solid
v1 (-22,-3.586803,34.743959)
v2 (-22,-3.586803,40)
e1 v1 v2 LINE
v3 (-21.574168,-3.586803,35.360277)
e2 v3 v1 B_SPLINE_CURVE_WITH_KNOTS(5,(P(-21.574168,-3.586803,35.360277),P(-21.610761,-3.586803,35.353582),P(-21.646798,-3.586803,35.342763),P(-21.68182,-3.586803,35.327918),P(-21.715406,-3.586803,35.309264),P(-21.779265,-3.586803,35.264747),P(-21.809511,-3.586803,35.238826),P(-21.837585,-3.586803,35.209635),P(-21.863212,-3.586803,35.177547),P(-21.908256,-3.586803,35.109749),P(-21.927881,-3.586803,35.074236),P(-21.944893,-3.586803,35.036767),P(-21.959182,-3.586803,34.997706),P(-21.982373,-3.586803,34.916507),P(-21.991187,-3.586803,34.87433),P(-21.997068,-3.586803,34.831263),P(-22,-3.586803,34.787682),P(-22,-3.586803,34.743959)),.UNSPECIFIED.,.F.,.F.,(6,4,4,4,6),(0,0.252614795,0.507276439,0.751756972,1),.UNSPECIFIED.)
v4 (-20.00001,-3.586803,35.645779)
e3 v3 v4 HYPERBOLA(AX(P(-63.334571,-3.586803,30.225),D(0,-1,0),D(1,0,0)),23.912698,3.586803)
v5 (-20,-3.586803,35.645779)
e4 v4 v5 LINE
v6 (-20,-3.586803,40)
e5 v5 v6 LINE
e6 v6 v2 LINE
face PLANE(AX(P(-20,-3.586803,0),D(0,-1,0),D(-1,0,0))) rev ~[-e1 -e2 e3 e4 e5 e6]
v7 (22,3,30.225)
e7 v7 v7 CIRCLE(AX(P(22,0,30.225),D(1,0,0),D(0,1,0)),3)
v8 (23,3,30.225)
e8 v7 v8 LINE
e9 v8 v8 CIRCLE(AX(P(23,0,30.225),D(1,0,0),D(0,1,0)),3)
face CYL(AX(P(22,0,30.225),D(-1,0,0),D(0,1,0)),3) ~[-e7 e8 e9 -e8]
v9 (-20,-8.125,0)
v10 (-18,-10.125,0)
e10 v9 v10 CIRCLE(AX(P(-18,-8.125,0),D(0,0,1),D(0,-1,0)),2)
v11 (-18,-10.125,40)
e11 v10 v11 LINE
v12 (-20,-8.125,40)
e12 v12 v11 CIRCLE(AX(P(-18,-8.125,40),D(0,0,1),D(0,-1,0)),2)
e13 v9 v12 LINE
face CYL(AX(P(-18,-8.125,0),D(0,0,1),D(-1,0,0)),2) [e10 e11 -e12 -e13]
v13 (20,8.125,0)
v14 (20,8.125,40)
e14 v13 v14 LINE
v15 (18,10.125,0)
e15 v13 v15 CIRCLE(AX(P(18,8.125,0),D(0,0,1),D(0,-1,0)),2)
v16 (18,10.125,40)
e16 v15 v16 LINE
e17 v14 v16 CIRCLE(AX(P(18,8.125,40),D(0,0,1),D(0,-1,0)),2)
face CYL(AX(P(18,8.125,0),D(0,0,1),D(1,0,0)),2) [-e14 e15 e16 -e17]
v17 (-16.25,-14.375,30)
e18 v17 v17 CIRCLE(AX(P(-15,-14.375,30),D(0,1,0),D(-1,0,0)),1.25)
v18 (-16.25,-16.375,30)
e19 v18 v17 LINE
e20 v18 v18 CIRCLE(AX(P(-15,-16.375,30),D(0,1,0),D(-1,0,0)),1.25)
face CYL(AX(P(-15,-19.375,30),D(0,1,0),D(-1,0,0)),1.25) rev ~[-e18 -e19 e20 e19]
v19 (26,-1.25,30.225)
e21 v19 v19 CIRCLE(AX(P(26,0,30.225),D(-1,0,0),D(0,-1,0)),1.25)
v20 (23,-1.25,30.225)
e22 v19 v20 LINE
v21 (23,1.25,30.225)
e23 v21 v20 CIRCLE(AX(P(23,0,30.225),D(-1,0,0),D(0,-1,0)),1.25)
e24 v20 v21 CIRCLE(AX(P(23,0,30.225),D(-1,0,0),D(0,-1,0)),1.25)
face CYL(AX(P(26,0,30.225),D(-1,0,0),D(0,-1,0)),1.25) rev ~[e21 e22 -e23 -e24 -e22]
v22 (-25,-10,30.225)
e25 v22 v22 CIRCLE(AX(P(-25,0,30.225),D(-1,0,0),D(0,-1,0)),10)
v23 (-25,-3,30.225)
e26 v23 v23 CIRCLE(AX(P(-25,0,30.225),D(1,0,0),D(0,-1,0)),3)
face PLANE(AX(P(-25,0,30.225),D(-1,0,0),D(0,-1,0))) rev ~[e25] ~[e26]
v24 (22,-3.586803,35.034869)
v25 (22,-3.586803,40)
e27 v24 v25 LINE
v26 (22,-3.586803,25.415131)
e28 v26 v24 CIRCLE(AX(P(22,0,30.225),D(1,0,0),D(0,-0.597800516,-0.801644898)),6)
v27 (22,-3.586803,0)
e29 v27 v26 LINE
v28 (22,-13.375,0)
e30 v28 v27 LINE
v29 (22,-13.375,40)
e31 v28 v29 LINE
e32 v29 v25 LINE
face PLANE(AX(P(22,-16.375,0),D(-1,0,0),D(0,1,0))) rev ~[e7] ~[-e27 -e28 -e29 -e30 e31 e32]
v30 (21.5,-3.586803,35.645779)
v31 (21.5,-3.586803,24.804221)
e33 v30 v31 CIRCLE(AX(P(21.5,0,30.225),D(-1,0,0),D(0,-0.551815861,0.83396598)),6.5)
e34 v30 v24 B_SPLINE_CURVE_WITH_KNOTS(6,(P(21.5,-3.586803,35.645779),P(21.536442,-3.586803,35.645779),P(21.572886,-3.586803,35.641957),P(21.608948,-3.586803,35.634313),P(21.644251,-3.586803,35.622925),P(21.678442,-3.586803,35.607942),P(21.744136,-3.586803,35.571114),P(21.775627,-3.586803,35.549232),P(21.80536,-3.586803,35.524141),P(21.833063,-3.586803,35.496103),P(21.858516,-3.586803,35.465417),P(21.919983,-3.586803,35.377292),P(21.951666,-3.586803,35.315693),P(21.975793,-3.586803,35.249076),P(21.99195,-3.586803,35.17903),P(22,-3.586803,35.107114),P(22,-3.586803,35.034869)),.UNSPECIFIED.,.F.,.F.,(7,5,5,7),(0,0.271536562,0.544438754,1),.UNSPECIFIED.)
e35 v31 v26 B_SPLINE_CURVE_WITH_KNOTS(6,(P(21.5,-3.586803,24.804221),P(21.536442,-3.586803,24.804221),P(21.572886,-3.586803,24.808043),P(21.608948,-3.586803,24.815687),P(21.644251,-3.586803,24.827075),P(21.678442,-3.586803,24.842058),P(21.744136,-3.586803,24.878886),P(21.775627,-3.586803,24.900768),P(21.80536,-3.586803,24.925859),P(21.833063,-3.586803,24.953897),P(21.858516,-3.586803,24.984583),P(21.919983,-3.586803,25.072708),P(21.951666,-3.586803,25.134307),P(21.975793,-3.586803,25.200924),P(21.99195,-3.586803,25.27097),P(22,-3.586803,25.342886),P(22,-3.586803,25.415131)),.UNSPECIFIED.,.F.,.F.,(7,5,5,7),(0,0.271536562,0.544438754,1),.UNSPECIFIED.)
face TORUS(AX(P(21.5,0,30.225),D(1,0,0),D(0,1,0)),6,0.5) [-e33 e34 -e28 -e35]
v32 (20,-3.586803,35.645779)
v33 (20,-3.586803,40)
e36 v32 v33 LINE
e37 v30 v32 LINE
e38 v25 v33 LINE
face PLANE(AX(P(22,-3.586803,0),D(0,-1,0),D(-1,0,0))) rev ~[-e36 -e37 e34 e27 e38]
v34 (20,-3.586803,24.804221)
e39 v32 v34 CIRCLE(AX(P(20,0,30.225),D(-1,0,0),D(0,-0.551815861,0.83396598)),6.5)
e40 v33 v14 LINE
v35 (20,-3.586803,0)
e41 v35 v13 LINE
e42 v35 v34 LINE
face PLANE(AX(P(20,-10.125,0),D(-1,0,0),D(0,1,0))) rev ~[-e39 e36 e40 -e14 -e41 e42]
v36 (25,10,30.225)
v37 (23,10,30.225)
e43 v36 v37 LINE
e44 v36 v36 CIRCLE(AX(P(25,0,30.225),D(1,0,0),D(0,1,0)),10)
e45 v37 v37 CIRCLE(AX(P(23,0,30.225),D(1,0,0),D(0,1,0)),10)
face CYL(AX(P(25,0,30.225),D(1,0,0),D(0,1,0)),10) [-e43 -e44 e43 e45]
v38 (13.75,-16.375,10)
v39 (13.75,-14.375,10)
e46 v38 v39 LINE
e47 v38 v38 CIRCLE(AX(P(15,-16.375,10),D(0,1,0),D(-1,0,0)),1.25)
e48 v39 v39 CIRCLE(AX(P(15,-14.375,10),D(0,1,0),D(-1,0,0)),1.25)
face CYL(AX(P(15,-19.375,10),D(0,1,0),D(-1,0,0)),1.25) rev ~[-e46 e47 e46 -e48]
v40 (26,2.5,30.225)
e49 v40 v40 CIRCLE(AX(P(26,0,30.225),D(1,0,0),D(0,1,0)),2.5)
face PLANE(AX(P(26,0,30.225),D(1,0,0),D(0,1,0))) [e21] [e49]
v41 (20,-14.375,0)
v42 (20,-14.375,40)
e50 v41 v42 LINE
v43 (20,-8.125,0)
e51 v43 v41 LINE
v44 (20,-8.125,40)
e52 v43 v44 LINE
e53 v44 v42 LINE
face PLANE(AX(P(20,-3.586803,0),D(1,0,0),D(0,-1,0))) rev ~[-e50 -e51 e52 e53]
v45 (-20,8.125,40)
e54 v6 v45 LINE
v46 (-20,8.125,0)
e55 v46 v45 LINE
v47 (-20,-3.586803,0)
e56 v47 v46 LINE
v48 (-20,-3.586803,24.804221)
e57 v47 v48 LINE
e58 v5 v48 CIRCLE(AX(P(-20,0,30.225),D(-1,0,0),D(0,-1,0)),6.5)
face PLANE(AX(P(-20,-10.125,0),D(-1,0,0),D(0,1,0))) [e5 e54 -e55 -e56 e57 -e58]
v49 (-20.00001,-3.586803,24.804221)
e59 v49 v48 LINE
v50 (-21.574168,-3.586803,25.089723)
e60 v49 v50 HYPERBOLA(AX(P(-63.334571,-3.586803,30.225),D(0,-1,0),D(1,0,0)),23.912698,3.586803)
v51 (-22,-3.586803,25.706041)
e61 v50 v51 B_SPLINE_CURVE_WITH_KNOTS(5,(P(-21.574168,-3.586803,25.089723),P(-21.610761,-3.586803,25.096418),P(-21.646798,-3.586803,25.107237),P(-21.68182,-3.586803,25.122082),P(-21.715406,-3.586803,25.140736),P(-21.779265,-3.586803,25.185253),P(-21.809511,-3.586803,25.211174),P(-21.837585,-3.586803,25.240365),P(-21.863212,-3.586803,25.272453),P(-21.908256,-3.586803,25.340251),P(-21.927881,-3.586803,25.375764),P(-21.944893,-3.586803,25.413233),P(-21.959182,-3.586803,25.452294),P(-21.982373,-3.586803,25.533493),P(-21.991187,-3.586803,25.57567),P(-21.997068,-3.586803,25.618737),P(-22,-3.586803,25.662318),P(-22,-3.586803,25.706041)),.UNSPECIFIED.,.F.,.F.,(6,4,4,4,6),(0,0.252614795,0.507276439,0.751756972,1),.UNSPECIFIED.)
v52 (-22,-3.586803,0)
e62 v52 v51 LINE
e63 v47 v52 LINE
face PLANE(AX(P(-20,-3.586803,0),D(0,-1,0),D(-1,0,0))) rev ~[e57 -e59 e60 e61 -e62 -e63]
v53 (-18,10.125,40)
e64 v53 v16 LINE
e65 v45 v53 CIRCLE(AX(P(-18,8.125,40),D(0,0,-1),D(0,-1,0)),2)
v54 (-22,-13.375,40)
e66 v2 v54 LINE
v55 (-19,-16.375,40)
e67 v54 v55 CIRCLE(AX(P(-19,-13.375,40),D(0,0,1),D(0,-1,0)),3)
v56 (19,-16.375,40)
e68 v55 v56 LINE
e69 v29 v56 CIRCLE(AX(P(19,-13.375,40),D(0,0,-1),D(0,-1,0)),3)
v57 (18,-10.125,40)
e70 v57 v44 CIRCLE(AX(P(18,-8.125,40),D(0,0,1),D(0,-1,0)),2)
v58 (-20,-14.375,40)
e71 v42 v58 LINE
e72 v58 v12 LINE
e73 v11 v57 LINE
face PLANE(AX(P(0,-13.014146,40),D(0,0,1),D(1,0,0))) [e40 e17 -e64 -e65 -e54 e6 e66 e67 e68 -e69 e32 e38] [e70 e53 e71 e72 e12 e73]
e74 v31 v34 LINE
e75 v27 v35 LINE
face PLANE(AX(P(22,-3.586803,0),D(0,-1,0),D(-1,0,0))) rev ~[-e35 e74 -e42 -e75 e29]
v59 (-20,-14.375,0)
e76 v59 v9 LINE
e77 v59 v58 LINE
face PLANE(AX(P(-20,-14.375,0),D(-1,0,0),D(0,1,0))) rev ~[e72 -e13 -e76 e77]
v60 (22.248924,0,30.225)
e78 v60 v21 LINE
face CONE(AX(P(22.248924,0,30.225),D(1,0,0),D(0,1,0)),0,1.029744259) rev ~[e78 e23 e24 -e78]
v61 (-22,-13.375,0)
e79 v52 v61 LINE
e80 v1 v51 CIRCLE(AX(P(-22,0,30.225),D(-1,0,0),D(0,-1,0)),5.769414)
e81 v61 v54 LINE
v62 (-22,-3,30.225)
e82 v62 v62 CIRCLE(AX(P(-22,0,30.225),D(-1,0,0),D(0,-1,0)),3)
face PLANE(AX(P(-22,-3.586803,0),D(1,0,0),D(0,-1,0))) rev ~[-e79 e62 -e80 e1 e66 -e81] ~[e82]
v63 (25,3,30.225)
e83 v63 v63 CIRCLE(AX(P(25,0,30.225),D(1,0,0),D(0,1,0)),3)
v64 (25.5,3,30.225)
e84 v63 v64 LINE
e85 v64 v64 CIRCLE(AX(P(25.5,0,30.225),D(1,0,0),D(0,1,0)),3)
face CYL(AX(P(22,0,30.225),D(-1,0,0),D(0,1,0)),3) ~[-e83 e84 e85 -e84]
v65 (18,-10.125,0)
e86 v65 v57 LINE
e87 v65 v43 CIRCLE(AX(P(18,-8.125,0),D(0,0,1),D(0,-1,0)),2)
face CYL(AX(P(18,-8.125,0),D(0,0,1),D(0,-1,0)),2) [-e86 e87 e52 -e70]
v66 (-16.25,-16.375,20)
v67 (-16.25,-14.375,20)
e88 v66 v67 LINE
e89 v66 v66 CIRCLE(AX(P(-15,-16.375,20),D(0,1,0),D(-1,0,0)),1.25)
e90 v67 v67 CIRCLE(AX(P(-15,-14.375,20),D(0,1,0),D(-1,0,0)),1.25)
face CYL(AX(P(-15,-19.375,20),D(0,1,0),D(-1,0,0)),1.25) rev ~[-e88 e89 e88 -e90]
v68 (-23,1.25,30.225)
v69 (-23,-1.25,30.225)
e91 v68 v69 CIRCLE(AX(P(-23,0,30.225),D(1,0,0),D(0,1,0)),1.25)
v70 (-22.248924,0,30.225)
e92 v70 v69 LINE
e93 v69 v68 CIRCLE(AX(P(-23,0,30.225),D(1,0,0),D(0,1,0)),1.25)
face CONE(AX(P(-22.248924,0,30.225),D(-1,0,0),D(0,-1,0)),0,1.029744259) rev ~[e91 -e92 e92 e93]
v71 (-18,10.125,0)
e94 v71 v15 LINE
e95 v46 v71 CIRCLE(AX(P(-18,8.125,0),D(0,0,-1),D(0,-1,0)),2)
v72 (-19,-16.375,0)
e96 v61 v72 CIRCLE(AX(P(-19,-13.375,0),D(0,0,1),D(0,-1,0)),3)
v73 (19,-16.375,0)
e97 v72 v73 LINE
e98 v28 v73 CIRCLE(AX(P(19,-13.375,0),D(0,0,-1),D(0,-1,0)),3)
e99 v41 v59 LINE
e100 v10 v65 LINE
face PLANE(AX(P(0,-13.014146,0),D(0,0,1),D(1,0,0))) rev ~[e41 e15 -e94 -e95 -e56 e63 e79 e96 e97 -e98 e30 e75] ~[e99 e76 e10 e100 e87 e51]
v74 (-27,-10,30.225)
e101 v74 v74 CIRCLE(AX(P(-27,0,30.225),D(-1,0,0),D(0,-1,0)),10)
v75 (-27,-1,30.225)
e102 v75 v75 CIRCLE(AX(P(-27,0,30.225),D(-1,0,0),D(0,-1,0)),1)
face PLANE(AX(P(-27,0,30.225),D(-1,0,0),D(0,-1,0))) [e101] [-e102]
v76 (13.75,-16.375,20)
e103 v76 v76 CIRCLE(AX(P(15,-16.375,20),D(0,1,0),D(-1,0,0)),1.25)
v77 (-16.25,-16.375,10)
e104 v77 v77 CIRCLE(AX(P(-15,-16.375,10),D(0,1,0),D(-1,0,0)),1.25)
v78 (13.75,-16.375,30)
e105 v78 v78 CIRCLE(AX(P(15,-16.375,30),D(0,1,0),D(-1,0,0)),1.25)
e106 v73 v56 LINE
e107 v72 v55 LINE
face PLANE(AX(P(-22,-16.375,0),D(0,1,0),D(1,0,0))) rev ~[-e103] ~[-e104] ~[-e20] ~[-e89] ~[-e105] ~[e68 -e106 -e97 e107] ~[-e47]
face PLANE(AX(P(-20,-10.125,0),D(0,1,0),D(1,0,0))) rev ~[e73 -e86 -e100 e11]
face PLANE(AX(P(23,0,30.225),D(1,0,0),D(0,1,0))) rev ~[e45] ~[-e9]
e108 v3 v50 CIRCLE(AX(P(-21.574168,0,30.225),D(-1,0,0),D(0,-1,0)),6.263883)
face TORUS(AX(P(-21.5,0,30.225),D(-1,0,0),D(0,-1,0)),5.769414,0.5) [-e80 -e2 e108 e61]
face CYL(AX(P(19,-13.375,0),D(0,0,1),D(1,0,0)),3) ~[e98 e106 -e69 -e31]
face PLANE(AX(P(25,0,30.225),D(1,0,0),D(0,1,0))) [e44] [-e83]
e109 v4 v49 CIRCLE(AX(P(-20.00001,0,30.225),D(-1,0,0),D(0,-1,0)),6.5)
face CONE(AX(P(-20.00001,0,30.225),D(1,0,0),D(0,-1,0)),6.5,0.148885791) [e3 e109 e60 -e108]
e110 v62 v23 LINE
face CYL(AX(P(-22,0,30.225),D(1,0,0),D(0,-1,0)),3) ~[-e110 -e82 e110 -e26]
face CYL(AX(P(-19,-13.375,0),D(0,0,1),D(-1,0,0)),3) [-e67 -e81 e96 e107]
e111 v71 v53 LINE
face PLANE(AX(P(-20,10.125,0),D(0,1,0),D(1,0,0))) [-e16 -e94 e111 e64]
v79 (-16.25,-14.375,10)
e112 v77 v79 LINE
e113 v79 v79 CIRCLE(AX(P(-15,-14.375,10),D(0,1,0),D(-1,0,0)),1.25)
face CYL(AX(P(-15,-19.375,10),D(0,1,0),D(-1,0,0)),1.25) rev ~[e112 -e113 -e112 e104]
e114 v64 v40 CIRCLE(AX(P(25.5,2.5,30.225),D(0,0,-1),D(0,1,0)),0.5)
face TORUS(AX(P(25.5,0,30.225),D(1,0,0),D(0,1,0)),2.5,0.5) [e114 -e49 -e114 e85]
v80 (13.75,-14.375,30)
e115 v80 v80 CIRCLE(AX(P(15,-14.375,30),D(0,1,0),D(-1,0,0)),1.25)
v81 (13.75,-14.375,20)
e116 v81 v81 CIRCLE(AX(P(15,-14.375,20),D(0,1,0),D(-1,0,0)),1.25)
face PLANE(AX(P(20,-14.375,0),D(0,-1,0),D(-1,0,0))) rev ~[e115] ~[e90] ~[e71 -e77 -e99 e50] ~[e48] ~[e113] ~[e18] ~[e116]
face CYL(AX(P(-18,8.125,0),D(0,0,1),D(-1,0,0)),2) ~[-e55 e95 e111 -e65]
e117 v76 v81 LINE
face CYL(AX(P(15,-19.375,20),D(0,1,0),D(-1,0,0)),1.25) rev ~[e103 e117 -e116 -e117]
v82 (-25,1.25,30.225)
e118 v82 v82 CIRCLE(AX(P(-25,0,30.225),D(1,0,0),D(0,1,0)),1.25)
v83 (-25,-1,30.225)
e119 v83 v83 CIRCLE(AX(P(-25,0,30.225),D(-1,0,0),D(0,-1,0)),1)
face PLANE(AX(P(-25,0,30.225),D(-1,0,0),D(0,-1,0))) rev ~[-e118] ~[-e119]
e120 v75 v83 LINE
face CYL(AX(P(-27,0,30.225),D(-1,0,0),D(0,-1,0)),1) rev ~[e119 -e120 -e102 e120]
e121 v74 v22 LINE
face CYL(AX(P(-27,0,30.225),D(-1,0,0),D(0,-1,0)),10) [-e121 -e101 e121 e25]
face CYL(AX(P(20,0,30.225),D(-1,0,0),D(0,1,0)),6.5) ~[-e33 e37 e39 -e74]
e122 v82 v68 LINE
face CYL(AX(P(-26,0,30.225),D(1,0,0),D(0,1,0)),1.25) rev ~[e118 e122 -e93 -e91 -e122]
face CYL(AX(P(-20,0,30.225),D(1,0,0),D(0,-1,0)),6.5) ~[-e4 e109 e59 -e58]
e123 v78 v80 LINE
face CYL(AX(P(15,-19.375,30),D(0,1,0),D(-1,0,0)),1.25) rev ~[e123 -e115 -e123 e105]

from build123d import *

# Parameters (mm, degrees)
F0_W            = 40
F0_H            = 20.25
F1_DEPTH        = 40
F2_R            = 2
F3_R            = 6.5
F4_DEPTH        = 2
F5_SIZE2        = 0.29999
F5_SIZE         = 1.99999
F6_R            = 0.5
F7_R            = 3
F8_DEPTH        = 4
F9_R            = 0.5
F10_R           = 6.5
F11_DEPTH       = 2
F12_R           = 0.5
F13_R           = 3
F14_DEPTH       = 4
F15_R           = 0.5
F17_D           = 2.5
F17_DEPTH       = 3
F17_CBORE_D     = 2.5
F17_CBORE_DEPTH = 0
F17_TIP         = 0.7510757738
F19_D           = 2.5
F19_DEPTH       = 3
F19_CBORE_D     = 2.5
F19_CBORE_DEPTH = 0
F19_TIP         = 0.7510757738
F21_R           = 10
F21_R_2         = 1
F22_DEPTH       = 2
F24_R           = 10
F24_R_2         = 3
F25_DEPTH       = 2
F27_DEPTH       = 40
F28_R           = 3
F30_D           = 2.5
F30_DEPTH       = 3
F30_TIP         = 0.7510757738


# Not quite as in the source:
# - a fillet or chamfer is up to 0.001 mm smaller than in the source, because OpenCascade refuses the exact size


with BuildPart() as f1:
    # F0 (on Top) → F1 (new body)
    with BuildSketch(Plane.XY):
        Rectangle(F0_W, F0_H)
    extrude(amount=F1_DEPTH)

    # F2
    f2_edges = [f1.edges().sort_by_distance(p)[0] for p in [
        (-20, 10.125, 20),
        (-20, -10.125, 20),
        (20, 10.125, 20),
        (20, -10.125, 20),
    ]]
    fillet(f2_edges, radius=F2_R)

    # F3 (on face) → F4 (join)
    with BuildSketch(Plane(origin=(-20, 0, 0), x_dir=(0, -1, 0), z_dir=(-1, 0, 0))):
        with Locations((0, 30.225)):
            Circle(F3_R)
    extrude(amount=F4_DEPTH)

    # F5 (size 2 and 0.3 in the source; OpenCascade refuses exactly that, so slightly less here)
    f5_edges = [f1.edges().sort_by_distance(p)[0] for p in [
        (-22, 6.5, 30.225),
    ]]
    chamfer(f5_edges, length=F5_SIZE, length2=F5_SIZE2)

    # F6
    f6_edges = [f1.edges().sort_by_distance(p)[0] for p in [
        (-22, 6.20001, 30.225),
    ]]
    fillet(f6_edges, radius=F6_R)

    # F7 (on face) → F8 (join)
    with BuildSketch(Plane(origin=(-22, 0, 0), x_dir=(0, -1, 0), z_dir=(-1, 0, 0))):
        with Locations((0, 30.225)):
            Circle(F7_R)
    extrude(amount=F8_DEPTH)

    # F9
    f9_edges = [f1.edges().sort_by_distance(p)[0] for p in [
        (-26, 3, 30.225),
    ]]
    fillet(f9_edges, radius=F9_R)

    # F10 (on face) → F11 (join)
    with BuildSketch(Plane.YZ.offset(20)):
        with Locations((0, 30.225)):
            Circle(F10_R)
    extrude(amount=F11_DEPTH)

    # F12
    f12_edges = [f1.edges().sort_by_distance(p)[0] for p in [
        (22, -6.5, 30.225),
    ]]
    fillet(f12_edges, radius=F12_R)

    # F13 (on face) → F14 (join)
    with BuildSketch(Plane.YZ.offset(22)):
        with Locations((0, 30.225)):
            Circle(F13_R)
    extrude(amount=F14_DEPTH)

    # F15
    f15_edges = [f1.edges().sort_by_distance(p)[0] for p in [
        (26, -3, 30.225),
    ]]
    fillet(f15_edges, radius=F15_R)

    # F17
    with Locations(Plane(origin=(-26, 0, 0), x_dir=(0, -1, 0), z_dir=(-1, 0, 0))):
        with Locations((0, 30.225)):
            CounterBoreHole(F17_D / 2, F17_CBORE_D / 2, F17_CBORE_DEPTH, depth=F17_DEPTH)
            with Locations((0, 0, -(F17_DEPTH + F17_TIP / 2))):  # 118° drill point
                Cone(0, F17_D / 2, F17_TIP, mode=Mode.SUBTRACT)

    # F19
    with Locations(Plane.YZ.offset(26)):
        with Locations((0, 30.225)):
            CounterBoreHole(F19_D / 2, F19_CBORE_D / 2, F19_CBORE_DEPTH, depth=F19_DEPTH)
            with Locations((0, 0, -(F19_DEPTH + F19_TIP / 2))):  # 118° drill point
                Cone(0, F19_D / 2, F19_TIP, mode=Mode.SUBTRACT)

    # F21 (on offset) → F22 (join)
    with BuildSketch(Plane(origin=(-27, 0, 0), x_dir=(0, -1, 0), z_dir=(-1, 0, 0))):
        with Locations((0, 30.225)):
            Circle(F21_R)
        with Locations((0, 30.225)):
            Circle(F21_R_2, mode=Mode.SUBTRACT)
    extrude(amount=-F22_DEPTH)

    # F24 (on offset) → F25 (join)
    with BuildSketch(Plane.YZ.offset(25)):
        with Locations((0, 30.225)):
            Circle(F24_R)
        with Locations((0, 30.225)):
            Circle(F24_R_2, mode=Mode.SUBTRACT)
    extrude(amount=-F25_DEPTH)

    # F26 (on Top) → F27 (join)
    with BuildSketch(Plane.XY):
        Polygon((22, -16.375), (22, -3.5868030973), (20, -3.5868030973), (20, -14.375), (-20, -14.375), (-20, -3.5868030973), (-22, -3.5868030973), (-22, -16.375), align=None)
    extrude(amount=F27_DEPTH)

    # F28
    f28_edges = [f1.edges().sort_by_distance(p)[0] for p in [
        (22, -16.375, 20),
        (-22, -16.375, 20),
    ]]
    fillet(f28_edges, radius=F28_R)

    # F30
    with Locations(Plane.XZ.offset(16.375)):
        with Locations((-15, 30), (15, 30), (15, 20), (-15, 20), (-15, 10), (15, 10)):
            Hole(F30_D / 2, depth=F30_DEPTH)
            with Locations((0, 0, -(F30_DEPTH + F30_TIP / 2))):  # 118° drill point
                Cone(0, F30_D / 2, F30_TIP, mode=Mode.SUBTRACT)


solid = f1.part
